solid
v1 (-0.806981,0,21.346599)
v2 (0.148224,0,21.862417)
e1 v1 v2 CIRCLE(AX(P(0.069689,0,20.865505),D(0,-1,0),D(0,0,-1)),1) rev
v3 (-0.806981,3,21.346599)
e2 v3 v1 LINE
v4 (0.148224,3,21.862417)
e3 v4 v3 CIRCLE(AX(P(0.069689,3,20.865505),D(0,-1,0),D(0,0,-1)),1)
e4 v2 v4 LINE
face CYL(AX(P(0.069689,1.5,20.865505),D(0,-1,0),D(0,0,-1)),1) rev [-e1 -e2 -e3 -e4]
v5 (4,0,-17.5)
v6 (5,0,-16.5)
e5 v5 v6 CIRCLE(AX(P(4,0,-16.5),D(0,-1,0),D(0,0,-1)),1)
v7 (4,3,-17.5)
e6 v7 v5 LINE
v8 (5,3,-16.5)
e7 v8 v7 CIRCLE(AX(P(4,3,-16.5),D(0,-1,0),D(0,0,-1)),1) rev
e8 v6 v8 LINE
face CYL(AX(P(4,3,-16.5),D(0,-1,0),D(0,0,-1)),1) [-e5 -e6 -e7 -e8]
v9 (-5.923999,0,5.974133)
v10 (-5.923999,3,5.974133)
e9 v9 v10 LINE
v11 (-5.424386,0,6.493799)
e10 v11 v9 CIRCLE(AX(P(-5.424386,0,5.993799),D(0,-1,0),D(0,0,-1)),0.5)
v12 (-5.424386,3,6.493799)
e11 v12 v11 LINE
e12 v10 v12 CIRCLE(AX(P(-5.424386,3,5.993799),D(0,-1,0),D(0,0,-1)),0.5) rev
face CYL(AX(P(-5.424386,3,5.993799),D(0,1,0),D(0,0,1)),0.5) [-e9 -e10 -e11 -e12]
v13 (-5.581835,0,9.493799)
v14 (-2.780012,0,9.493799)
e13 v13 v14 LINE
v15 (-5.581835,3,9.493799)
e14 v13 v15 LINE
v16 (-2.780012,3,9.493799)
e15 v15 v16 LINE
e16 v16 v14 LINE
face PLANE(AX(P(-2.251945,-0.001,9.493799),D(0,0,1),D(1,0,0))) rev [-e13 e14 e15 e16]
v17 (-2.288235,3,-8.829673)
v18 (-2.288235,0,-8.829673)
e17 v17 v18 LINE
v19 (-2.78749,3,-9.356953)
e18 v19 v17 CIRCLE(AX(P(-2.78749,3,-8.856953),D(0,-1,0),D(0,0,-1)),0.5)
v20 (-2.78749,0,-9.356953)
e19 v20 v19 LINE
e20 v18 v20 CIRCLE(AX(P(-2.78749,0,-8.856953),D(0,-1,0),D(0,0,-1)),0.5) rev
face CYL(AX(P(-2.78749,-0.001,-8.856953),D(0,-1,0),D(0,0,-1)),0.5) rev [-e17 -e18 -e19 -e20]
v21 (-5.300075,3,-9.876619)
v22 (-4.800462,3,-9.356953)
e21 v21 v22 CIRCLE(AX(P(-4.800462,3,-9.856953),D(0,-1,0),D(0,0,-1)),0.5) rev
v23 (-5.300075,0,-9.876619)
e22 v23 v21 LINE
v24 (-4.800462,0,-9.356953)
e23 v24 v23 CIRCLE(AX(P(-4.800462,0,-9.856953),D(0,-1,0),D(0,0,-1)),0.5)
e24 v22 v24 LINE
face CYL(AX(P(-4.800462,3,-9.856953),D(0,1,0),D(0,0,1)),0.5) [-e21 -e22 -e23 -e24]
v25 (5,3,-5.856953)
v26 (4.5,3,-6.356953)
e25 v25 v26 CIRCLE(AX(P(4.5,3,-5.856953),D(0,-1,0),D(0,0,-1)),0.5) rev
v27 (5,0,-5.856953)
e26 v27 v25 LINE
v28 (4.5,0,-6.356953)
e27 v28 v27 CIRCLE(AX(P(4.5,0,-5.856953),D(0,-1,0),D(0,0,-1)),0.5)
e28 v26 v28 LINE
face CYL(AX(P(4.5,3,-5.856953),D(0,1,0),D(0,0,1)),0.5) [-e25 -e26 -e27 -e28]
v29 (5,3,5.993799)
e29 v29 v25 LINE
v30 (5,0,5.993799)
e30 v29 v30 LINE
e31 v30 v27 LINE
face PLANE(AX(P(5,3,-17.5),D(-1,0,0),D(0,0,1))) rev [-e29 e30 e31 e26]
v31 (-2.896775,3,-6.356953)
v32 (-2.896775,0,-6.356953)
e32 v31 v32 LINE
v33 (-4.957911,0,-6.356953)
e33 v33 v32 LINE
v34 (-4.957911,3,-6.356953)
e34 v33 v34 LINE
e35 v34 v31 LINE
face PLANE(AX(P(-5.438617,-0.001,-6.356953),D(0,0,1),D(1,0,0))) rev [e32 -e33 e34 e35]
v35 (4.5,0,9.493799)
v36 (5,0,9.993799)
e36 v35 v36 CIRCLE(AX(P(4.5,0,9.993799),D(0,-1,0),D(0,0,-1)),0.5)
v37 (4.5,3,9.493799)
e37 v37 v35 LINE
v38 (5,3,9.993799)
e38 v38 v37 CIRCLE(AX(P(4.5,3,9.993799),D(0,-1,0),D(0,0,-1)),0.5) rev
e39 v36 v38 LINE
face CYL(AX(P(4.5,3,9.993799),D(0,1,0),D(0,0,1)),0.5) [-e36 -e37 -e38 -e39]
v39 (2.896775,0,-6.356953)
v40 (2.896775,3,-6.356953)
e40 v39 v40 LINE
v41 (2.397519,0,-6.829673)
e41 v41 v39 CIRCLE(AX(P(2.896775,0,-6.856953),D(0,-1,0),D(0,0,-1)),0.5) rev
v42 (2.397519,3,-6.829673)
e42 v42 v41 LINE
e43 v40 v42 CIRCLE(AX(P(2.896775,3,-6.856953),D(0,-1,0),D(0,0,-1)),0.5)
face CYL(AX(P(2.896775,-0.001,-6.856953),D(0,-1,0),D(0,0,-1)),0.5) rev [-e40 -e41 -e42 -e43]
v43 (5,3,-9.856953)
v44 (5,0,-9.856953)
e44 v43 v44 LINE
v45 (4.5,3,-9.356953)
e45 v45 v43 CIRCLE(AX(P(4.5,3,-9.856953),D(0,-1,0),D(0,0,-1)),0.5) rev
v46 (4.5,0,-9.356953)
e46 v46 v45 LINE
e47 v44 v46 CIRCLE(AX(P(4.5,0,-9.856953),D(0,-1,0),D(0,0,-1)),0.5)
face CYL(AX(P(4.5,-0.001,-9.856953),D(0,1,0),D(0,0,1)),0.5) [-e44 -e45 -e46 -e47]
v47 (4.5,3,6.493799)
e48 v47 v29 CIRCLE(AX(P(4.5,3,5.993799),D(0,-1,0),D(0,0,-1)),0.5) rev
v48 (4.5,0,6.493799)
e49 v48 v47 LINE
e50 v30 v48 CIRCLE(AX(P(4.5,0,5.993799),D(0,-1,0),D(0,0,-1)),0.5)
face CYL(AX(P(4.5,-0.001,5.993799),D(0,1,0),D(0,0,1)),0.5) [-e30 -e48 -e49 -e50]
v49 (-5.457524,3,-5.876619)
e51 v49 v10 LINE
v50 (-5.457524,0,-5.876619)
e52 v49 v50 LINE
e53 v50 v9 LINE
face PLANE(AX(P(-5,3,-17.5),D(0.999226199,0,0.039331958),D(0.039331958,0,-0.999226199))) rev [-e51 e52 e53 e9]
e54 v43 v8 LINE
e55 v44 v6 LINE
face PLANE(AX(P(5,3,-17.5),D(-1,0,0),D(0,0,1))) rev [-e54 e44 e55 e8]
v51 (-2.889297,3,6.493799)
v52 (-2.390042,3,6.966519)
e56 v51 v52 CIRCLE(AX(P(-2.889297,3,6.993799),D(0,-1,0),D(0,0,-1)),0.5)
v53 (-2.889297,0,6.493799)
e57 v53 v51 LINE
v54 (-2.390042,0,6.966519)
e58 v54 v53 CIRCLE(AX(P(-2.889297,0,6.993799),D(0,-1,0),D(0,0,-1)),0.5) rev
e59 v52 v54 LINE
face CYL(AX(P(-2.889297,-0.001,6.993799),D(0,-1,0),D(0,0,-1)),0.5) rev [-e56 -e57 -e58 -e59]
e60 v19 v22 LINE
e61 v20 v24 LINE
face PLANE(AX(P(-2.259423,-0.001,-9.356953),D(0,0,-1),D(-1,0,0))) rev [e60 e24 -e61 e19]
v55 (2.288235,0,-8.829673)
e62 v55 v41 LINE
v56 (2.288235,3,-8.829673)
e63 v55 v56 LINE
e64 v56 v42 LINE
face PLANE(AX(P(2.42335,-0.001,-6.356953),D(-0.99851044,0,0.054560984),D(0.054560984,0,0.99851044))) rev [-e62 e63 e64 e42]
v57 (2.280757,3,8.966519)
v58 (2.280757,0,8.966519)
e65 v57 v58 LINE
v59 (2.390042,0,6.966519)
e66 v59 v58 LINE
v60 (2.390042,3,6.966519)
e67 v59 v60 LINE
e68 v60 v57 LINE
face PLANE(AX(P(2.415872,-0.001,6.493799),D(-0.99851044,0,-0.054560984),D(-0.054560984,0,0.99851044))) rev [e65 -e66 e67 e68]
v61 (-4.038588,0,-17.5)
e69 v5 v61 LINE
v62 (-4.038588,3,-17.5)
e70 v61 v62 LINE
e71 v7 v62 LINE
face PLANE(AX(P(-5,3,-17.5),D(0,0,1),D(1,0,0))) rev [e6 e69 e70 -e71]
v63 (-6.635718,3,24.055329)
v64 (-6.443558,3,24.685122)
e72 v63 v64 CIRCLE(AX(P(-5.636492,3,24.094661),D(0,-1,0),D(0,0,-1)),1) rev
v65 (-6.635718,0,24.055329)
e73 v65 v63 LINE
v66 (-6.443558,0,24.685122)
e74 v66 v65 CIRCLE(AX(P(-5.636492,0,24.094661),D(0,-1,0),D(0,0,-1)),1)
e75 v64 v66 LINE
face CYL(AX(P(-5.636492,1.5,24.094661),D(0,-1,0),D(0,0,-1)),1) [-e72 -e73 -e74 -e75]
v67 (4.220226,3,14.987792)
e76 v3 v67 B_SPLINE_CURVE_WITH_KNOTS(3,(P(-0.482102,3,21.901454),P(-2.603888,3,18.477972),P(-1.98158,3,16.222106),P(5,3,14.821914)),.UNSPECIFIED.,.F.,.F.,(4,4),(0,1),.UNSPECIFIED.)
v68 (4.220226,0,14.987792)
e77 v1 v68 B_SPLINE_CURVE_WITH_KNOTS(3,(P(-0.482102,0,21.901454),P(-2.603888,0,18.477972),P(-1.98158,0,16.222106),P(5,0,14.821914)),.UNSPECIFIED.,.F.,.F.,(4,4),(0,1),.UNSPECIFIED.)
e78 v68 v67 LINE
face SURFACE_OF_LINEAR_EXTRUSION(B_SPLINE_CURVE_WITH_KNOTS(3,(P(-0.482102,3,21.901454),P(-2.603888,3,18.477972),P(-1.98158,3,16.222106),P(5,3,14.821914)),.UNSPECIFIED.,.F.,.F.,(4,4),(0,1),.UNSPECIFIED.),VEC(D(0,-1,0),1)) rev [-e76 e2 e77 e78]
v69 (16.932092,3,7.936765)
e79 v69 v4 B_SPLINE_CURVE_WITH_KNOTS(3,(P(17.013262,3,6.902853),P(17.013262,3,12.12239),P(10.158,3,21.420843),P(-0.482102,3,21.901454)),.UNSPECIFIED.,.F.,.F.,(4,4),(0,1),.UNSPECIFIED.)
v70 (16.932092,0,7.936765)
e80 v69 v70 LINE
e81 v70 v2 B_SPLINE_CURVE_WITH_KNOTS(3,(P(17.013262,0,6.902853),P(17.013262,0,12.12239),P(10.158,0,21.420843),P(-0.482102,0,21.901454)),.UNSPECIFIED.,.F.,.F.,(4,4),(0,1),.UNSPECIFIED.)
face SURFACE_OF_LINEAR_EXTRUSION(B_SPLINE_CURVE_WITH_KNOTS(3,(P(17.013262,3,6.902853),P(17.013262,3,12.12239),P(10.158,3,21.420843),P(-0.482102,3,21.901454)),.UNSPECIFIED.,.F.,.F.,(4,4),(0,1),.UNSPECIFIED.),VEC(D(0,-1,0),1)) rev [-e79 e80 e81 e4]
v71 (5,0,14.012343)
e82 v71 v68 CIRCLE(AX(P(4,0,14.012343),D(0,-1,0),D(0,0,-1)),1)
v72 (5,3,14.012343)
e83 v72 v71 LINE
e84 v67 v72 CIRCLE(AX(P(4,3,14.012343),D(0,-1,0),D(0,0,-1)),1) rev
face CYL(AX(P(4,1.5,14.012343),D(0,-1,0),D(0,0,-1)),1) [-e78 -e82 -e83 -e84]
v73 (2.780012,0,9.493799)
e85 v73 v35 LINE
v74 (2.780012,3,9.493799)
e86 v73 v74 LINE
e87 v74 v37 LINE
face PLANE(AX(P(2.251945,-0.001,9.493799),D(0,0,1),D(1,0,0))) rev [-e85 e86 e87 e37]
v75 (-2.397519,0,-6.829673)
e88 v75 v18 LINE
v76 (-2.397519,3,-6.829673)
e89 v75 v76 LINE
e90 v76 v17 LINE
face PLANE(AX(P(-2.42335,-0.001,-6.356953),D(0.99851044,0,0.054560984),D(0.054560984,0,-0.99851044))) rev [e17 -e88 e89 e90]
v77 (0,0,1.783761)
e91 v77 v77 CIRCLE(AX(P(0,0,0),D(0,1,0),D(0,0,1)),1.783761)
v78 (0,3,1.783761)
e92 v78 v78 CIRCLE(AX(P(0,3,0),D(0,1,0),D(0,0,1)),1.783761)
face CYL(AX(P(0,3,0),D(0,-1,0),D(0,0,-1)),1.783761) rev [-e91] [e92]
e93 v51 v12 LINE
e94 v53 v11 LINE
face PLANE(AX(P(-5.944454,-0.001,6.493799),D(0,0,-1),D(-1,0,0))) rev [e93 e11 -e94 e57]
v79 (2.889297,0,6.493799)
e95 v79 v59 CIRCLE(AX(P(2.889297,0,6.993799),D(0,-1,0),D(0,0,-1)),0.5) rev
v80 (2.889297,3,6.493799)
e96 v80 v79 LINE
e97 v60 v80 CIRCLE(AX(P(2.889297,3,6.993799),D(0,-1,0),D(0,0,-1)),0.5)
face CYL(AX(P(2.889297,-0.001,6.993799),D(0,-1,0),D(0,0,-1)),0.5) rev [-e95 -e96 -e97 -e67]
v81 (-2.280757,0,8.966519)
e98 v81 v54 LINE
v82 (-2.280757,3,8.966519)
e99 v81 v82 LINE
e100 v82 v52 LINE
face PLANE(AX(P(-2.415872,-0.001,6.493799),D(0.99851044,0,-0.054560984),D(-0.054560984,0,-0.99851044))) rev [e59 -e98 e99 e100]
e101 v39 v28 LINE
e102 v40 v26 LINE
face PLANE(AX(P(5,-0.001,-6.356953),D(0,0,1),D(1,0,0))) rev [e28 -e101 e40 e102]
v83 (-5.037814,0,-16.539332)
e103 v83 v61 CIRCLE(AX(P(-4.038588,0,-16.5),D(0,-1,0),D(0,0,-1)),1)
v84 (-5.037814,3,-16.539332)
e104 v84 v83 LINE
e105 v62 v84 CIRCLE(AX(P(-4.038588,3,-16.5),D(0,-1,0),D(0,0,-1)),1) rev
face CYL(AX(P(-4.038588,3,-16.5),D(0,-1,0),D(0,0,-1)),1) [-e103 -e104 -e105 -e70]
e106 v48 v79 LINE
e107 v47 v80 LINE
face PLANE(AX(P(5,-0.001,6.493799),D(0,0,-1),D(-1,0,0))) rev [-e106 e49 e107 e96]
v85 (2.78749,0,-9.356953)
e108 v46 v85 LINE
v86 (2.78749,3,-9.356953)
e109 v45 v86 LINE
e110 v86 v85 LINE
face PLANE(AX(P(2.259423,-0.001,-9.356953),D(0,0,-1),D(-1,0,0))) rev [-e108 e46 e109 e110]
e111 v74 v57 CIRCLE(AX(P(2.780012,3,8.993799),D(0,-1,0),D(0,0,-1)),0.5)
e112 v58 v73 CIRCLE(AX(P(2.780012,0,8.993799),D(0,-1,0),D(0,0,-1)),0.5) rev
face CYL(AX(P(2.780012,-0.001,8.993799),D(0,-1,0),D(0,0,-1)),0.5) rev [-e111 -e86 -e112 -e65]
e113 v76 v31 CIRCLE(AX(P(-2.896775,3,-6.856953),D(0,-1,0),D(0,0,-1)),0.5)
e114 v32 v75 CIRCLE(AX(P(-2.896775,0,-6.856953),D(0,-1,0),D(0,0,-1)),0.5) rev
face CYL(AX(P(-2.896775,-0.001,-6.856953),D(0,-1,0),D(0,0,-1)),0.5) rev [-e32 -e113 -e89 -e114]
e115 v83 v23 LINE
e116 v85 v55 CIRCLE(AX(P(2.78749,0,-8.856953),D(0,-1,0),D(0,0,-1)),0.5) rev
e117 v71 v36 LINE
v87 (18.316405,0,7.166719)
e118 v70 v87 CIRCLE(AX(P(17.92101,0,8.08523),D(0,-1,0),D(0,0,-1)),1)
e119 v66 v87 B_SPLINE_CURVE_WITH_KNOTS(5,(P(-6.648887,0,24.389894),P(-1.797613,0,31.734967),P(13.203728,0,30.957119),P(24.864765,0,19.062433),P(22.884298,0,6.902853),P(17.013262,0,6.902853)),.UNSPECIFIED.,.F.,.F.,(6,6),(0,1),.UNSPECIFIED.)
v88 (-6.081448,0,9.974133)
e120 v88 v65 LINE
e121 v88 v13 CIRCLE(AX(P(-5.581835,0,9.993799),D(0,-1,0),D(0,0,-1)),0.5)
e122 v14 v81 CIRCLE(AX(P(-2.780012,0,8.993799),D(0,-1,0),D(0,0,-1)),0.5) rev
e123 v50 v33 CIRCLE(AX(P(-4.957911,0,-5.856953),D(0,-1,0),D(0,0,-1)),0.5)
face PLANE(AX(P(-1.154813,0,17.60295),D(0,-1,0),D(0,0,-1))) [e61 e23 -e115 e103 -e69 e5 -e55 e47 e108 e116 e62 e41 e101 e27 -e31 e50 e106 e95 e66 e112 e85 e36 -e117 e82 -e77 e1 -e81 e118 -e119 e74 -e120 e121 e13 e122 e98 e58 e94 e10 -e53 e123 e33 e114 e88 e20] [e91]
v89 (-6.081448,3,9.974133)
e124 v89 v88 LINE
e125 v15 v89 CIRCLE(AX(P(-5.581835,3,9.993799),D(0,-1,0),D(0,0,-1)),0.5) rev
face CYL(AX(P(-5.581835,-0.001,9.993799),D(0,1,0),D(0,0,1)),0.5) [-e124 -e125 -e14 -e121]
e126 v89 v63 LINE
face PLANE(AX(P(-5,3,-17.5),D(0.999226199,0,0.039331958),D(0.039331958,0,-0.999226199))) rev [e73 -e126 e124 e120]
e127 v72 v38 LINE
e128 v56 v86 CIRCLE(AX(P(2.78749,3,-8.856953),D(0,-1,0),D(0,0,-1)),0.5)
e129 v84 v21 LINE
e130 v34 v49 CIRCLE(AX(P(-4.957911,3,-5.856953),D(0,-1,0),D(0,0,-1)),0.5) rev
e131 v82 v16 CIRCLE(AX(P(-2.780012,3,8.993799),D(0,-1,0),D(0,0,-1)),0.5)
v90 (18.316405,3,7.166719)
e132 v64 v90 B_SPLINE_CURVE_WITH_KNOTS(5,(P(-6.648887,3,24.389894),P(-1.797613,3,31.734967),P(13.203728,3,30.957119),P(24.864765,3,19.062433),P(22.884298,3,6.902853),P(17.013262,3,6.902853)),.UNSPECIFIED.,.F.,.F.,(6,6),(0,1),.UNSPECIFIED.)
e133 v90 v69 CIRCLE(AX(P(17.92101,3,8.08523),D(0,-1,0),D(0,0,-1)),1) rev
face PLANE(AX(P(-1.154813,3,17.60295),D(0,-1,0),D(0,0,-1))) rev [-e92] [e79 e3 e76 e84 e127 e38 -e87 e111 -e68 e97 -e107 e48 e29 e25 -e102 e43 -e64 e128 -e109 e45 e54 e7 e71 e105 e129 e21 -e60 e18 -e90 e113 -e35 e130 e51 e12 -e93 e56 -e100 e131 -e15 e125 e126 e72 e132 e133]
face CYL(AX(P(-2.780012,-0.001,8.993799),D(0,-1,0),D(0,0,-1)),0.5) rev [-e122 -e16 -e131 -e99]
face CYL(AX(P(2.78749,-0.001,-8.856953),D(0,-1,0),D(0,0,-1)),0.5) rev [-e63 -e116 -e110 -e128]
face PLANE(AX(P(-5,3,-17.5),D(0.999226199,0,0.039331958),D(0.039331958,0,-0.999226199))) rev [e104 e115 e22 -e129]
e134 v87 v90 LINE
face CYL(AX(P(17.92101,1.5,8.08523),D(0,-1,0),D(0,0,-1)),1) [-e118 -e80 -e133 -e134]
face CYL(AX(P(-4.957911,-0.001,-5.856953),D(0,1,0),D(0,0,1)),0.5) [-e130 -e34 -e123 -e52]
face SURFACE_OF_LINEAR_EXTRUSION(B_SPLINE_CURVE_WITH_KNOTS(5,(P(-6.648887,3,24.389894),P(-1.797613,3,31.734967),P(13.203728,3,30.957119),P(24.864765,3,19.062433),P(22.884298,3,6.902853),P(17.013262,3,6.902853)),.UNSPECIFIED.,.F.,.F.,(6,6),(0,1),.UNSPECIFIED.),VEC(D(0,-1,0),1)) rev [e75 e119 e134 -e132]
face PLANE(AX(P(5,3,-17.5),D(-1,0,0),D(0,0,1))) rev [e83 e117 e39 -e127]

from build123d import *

# Parameters (mm, degrees)
BOSS_EXTRUDE1_OUTLINE_R = 1.783761197
BOSS_EXTRUDE1_DEPTH     = 3
CUT_EXTRUDE1_REACH      = 37.306
FILLET1_R               = 1
FILLET2_R               = 0.5


# Read off the part's stored shape, not the designer's step: Boss-Extrude1
with BuildPart() as part:
    # Boss-Extrude1 outline → Boss-Extrude1 (new body)
    with BuildSketch(Plane(origin=(0, 0, 0), x_dir=(1, 0, 0), z_dir=(0, 1, 0))):
        with BuildLine():
            Line((5, 17.5), (-5, 17.5))
            Line((-5, 17.5), (-6.648887471, -24.389894135))
            add(Edge.make_bspline(
                [(-6.648887471, -24.389894135), (-1.79761276, -31.734966706), (13.203728073, -30.957119403), (24.864765464, -19.062433132), (22.884297555, -6.902852925), (17.013261533, -6.902852925)],
                knots=[0, 0, 0, 0, 0, 0, 1, 1, 1, 1, 1, 1], degree=5))
            add(Edge.make_bspline(
                [(17.013261533, -6.902852925), (17.013261533, -12.122390468), (10.158000359, -21.42084271), (-0.482101901, -21.901454261)],
                knots=[0, 0, 0, 0, 1, 1, 1, 1], degree=3))
            add(Edge.make_bspline(
                [(-0.482101901, -21.901454261), (-2.603887856, -18.477971621), (-1.981580223, -16.222106451), (5, -14.821914277)],
                knots=[0, 0, 0, 0, 1, 1, 1, 1], degree=3))
            Line((5, -14.821914277), (5, 17.5))
        make_face()
        Circle(BOSS_EXTRUDE1_OUTLINE_R, mode=Mode.SUBTRACT)
    extrude(amount=BOSS_EXTRUDE1_DEPTH)

    # Sketch2 → Cut-Extrude1 (cut, up to next)
    with BuildSketch(Plane(origin=(0, 3, 0), x_dir=(1, 0, 0), z_dir=(0, 1, 0)), mode=Mode.PRIVATE) as cut_extrude1_sk1:
        Polygon((-5.438617253, 6.356953165), (-2.423349926, 6.356953165), (-2.259422797, 9.356953165), (-5.320530003, 9.356953165), align=None)
    cut_extrude1_tool1 = extrude(cut_extrude1_sk1.sketch, amount=-CUT_EXTRUDE1_REACH, mode=Mode.PRIVATE) & part.part
    # Sketch2 → Cut-Extrude1 (cut, up to next)
    with BuildSketch(Plane(origin=(0, 3, 0), x_dir=(1, 0, 0), z_dir=(0, 1, 0)), mode=Mode.PRIVATE) as cut_extrude1_sk2:
        Polygon((5, 6.356953165), (2.423349926, 6.356953165), (2.259422797, 9.356953165), (5, 9.356953165), align=None)
    cut_extrude1_tool2 = extrude(cut_extrude1_sk2.sketch, amount=-CUT_EXTRUDE1_REACH, mode=Mode.PRIVATE) & part.part
    # Sketch2 → Cut-Extrude1 (cut, up to next)
    with BuildSketch(Plane(origin=(0, 3, 0), x_dir=(1, 0, 0), z_dir=(0, 1, 0)), mode=Mode.PRIVATE) as cut_extrude1_sk3:
        Polygon((-5.944453926, -6.493799271), (-2.41587233, -6.493799271), (-2.2519452, -9.493799271), (-6.062541177, -9.493799271), align=None)
    cut_extrude1_tool3 = extrude(cut_extrude1_sk3.sketch, amount=-CUT_EXTRUDE1_REACH, mode=Mode.PRIVATE) & part.part
    # Sketch2 → Cut-Extrude1 (cut, up to next)
    with BuildSketch(Plane(origin=(0, 3, 0), x_dir=(1, 0, 0), z_dir=(0, 1, 0)), mode=Mode.PRIVATE) as cut_extrude1_sk4:
        Polygon((5, -6.493799271), (2.41587233, -6.493799271), (2.2519452, -9.493799271), (5, -9.493799271), align=None)
    cut_extrude1_tool4 = extrude(cut_extrude1_sk4.sketch, amount=-CUT_EXTRUDE1_REACH, mode=Mode.PRIVATE) & part.part
    add(cut_extrude1_tool1.solids().sort_by_distance((-3.860303, 3, -7.860725))[0], mode=Mode.SUBTRACT)
    add(cut_extrude1_tool2.solids().sort_by_distance((3.670272, 3, -7.872368))[0], mode=Mode.SUBTRACT)
    add(cut_extrude1_tool3.solids().sort_by_distance((-4.168556, 3, 8.013012))[0], mode=Mode.SUBTRACT)
    add(cut_extrude1_tool4.solids().sort_by_distance((3.666534, 3, 8.009171))[0], mode=Mode.SUBTRACT)

    # Fillet1
    fillet1_edges = [part.edges().sort_by_distance(p)[0] for p in [
        (-5, 1.5, -17.5),
        (5, 1.5, -17.5),
        (5, 1.5, 14.821914277),
        (-6.648887471, 1.5, 24.389894135),
        (17.013261533, 1.5, 6.902852925),
        (-0.482101901, 1.5, 21.901454261),
    ]]
    fillet(fillet1_edges, radius=FILLET1_R)

    # Fillet2
    fillet2_edges = [part.edges().sort_by_distance(p)[0] for p in [
        (5, 1.5, -9.356953165),
        (5, 1.5, -6.356953165),
        (2.423349926, 1.5, -6.356953165),
        (2.259422797, 1.5, -9.356953165),
        (-6.062541177, 1.5, 9.493799271),
        (-5.944453926, 1.5, 6.493799271),
        (-2.41587233, 1.5, 6.493799271),
        (-2.2519452, 1.5, 9.493799271),
        (5, 1.5, 6.493799271),
        (5, 1.5, 9.493799271),
        (2.2519452, 1.5, 9.493799271),
        (2.41587233, 1.5, 6.493799271),
        (-5.438617253, 1.5, -6.356953165),
        (-5.320530003, 1.5, -9.356953165),
        (-2.259422797, 1.5, -9.356953165),
        (-2.423349926, 1.5, -6.356953165),
    ]]
    fillet(fillet2_edges, radius=FILLET2_R)


solid = part.part
